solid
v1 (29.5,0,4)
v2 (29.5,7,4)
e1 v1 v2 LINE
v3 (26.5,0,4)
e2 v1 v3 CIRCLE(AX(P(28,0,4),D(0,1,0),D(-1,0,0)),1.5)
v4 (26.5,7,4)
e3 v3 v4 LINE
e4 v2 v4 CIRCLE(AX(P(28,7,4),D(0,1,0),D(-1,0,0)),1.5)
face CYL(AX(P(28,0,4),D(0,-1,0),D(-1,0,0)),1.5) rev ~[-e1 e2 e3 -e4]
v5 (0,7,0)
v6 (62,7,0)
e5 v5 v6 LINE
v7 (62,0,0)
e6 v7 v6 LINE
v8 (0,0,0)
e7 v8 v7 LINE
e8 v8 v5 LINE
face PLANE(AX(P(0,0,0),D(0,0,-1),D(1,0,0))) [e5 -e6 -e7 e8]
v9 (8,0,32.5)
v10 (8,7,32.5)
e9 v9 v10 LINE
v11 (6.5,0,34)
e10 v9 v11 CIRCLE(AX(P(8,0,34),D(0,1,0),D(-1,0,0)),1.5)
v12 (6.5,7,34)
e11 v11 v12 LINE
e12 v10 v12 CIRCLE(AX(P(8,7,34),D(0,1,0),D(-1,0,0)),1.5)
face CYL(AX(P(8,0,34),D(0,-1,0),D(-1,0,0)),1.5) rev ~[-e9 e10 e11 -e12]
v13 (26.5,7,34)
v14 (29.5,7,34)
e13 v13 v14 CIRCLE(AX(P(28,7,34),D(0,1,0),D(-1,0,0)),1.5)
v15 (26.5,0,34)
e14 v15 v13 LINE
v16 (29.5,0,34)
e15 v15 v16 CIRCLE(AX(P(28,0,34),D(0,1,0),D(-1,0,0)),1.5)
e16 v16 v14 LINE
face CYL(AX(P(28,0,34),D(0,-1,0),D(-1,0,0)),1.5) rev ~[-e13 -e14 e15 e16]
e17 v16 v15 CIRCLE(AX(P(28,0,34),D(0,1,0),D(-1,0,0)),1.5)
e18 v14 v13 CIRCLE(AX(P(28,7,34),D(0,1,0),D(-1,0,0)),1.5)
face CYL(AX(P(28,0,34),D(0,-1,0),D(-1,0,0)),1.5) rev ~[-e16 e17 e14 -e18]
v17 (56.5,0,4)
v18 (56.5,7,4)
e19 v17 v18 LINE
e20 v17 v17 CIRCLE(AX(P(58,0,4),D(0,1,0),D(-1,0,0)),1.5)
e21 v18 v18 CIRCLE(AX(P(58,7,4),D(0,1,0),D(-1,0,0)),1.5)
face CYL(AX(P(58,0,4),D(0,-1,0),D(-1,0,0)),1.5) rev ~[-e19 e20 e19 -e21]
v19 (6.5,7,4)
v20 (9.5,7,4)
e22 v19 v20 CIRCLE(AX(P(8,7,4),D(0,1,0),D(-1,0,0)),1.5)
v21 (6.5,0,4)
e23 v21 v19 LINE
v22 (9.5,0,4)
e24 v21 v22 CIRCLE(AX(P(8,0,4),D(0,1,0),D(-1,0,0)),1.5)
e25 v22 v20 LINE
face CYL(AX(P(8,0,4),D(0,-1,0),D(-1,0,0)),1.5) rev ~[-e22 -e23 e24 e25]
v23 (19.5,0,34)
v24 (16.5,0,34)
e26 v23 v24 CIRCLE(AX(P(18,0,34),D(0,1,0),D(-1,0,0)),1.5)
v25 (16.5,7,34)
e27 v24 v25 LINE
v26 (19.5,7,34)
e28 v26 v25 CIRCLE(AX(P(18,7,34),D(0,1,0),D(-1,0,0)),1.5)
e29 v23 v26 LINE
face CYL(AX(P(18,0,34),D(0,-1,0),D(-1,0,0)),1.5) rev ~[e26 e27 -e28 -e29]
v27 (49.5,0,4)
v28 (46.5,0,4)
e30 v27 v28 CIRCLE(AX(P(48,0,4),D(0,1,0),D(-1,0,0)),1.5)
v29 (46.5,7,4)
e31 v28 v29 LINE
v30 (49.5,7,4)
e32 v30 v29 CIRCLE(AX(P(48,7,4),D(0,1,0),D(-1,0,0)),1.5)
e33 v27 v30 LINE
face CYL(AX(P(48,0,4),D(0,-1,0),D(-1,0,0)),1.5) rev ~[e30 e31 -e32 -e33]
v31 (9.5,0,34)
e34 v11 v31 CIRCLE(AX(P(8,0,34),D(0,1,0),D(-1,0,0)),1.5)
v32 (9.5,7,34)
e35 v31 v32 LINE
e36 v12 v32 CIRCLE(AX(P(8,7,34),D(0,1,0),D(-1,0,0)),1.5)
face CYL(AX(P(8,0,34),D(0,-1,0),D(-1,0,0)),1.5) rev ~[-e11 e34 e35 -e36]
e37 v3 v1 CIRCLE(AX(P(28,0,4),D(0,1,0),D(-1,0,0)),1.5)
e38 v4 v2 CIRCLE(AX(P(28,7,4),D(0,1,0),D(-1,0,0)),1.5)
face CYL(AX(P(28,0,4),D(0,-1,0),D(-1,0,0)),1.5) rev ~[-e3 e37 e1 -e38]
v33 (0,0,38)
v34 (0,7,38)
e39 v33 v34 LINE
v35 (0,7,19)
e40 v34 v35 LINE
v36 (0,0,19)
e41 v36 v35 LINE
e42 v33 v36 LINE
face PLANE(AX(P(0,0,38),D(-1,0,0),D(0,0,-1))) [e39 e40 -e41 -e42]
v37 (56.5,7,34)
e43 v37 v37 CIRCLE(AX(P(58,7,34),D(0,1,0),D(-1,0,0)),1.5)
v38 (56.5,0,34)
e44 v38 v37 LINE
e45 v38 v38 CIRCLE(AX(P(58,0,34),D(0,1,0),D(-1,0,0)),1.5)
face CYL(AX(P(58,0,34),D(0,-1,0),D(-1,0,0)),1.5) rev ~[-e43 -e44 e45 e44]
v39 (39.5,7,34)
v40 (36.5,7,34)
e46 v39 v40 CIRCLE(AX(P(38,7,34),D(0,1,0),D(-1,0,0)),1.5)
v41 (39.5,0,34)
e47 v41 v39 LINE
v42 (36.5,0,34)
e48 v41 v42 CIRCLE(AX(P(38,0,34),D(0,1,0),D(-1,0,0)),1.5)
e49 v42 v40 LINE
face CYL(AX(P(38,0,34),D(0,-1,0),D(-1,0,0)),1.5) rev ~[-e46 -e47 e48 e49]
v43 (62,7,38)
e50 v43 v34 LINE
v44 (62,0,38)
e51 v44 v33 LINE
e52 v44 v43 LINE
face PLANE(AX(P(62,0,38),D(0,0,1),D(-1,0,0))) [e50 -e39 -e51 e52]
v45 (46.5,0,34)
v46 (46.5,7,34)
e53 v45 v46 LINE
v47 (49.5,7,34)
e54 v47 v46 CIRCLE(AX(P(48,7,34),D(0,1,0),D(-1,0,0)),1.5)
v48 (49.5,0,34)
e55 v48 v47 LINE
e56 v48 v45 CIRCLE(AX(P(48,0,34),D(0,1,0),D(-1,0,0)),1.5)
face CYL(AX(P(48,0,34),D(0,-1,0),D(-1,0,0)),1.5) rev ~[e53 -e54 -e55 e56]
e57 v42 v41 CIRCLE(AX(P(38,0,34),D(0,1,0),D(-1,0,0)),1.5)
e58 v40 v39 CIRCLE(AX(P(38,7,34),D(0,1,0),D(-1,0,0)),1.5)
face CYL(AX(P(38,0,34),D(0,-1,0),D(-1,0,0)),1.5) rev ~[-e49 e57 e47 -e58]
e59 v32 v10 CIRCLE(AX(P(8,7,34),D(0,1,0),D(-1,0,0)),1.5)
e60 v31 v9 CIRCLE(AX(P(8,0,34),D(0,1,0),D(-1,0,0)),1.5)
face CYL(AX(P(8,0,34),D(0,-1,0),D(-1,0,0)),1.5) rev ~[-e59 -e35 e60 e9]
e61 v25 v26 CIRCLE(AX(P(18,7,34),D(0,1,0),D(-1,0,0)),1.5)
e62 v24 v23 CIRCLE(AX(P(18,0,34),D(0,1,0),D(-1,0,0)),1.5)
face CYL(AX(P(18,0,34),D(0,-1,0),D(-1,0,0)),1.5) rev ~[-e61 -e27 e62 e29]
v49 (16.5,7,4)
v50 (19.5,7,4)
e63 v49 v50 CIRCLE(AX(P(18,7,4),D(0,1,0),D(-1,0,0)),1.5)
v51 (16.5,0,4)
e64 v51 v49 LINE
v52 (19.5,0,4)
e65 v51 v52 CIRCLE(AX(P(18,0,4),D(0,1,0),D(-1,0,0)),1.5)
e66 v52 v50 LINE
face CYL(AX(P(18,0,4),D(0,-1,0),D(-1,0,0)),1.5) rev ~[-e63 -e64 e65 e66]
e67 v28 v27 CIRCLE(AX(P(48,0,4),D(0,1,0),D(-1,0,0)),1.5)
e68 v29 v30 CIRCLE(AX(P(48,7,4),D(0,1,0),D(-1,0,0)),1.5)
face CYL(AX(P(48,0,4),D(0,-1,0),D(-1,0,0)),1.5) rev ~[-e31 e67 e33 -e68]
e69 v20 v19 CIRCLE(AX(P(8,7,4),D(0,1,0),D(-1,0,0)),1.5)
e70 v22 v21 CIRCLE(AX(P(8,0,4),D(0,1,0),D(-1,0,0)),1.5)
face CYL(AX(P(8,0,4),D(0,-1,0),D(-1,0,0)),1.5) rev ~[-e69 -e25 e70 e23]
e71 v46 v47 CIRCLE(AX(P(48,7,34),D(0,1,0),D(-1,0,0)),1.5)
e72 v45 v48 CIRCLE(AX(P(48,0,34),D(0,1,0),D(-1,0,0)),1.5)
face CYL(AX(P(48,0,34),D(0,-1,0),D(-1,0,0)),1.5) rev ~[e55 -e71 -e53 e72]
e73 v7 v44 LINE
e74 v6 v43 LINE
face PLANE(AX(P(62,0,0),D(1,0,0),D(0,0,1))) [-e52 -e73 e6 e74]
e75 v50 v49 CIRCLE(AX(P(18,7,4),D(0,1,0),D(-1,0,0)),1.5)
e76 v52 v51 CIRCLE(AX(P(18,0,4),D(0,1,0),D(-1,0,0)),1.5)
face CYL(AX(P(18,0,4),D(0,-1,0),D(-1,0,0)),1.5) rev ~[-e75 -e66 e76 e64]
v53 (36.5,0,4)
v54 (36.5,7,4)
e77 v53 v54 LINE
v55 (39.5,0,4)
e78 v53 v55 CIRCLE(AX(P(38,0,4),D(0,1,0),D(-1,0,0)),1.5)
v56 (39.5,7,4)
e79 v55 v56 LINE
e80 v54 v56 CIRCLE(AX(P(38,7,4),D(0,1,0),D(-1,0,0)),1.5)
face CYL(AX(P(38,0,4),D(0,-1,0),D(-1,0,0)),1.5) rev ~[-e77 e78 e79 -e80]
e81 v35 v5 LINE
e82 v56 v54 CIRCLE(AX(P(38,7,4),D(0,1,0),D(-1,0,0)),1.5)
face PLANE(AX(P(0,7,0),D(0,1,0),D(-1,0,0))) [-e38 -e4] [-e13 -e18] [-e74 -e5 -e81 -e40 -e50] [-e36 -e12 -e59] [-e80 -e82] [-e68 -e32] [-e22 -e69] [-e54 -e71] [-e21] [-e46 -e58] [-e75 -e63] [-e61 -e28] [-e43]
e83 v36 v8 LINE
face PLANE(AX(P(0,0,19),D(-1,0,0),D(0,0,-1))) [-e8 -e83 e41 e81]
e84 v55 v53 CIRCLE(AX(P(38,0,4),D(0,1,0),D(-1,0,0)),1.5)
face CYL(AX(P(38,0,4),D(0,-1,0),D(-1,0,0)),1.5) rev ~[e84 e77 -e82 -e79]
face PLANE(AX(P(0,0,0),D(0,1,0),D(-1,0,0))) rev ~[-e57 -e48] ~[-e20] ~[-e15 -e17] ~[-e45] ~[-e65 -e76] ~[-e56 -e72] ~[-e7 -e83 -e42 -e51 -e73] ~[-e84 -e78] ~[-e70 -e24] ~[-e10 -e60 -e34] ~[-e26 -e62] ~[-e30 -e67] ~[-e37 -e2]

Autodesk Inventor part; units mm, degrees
ref_plane "YZ Plane" through (0, 0, 0) normal (1, 0, 0) x (0, 1, 0)
ref_plane "XZ Plane" through (0, 0, 0) normal (0, 1, 0) x (-1, 0, 0)
ref_plane "XY Plane" through (0, 0, 0) normal (0, 0, 1) x (1, 0, 0)
sketch "スケッチ1" plane through (0, 0, 0) normal (0, 1, 0) x (-1, 0, 0)
  line L0 (0, 0) -> (-62, 0)
  line L1 (-62, 0) -> (-62, 38)
  line L2 (-62, 38) -> (0, 38)
  line L3 (0, 38) -> (0, 0)
  line L4 (0, 19) -> (-8, 19)
  line L5 (-8, 19) -> (-8, 34)
  line L6 (-8, 34) -> (-18, 34)
  line L7 (-18, 34) -> (-28, 34)
  line L8 (-28, 34) -> (-38, 34)
  line L9 (-38, 34) -> (-48, 34)
  line L10 (-48, 34) -> (-58, 34)
  line L11 (-8, 4) -> (-18, 4)
  line L12 (-18, 4) -> (-28, 4)
  line L13 (-28, 4) -> (-38, 4)
  line L14 (-38, 4) -> (-48, 4)
  line L15 (-48, 4) -> (-58, 4)
  circle A0 centre (-58, 34) radius 1.5
  circle A1 centre (-48, 34) radius 1.5
  circle A2 centre (-38, 34) radius 1.5
  circle A3 centre (-28, 34) radius 1.5
  circle A4 centre (-18, 34) radius 1.5
  circle A5 centre (-8, 34) radius 1.5
  circle A6 centre (-58, 4) radius 1.5
  circle A7 centre (-48, 4) radius 1.5
  circle A8 centre (-38, 4) radius 1.5
  circle A9 centre (-28, 4) radius 1.5
  circle A10 centre (-18, 4) radius 1.5
  circle A11 centre (-8, 4) radius 1.5
  dimension "d0" = 62
  dimension "d1" = 38
  dimension "d2" = 8
  dimension "d3" = 15
  dimension "d4" = 10
  dimension "d5" = 10
  dimension "d6" = 10
  dimension "d7" = 10
  dimension "d8" = 10
  dimension "d9" = 3
  dimension "d10" = 3
  dimension "d11" = 3
  dimension "d12" = 3
  dimension "d13" = 3
  dimension "d14" = 3
extrude "押し出し1" add sketch "スケッチ1" along normal blind 7
properties part number "知能ロボコンギアボックススペーサ" material "ABS プラスチック"
